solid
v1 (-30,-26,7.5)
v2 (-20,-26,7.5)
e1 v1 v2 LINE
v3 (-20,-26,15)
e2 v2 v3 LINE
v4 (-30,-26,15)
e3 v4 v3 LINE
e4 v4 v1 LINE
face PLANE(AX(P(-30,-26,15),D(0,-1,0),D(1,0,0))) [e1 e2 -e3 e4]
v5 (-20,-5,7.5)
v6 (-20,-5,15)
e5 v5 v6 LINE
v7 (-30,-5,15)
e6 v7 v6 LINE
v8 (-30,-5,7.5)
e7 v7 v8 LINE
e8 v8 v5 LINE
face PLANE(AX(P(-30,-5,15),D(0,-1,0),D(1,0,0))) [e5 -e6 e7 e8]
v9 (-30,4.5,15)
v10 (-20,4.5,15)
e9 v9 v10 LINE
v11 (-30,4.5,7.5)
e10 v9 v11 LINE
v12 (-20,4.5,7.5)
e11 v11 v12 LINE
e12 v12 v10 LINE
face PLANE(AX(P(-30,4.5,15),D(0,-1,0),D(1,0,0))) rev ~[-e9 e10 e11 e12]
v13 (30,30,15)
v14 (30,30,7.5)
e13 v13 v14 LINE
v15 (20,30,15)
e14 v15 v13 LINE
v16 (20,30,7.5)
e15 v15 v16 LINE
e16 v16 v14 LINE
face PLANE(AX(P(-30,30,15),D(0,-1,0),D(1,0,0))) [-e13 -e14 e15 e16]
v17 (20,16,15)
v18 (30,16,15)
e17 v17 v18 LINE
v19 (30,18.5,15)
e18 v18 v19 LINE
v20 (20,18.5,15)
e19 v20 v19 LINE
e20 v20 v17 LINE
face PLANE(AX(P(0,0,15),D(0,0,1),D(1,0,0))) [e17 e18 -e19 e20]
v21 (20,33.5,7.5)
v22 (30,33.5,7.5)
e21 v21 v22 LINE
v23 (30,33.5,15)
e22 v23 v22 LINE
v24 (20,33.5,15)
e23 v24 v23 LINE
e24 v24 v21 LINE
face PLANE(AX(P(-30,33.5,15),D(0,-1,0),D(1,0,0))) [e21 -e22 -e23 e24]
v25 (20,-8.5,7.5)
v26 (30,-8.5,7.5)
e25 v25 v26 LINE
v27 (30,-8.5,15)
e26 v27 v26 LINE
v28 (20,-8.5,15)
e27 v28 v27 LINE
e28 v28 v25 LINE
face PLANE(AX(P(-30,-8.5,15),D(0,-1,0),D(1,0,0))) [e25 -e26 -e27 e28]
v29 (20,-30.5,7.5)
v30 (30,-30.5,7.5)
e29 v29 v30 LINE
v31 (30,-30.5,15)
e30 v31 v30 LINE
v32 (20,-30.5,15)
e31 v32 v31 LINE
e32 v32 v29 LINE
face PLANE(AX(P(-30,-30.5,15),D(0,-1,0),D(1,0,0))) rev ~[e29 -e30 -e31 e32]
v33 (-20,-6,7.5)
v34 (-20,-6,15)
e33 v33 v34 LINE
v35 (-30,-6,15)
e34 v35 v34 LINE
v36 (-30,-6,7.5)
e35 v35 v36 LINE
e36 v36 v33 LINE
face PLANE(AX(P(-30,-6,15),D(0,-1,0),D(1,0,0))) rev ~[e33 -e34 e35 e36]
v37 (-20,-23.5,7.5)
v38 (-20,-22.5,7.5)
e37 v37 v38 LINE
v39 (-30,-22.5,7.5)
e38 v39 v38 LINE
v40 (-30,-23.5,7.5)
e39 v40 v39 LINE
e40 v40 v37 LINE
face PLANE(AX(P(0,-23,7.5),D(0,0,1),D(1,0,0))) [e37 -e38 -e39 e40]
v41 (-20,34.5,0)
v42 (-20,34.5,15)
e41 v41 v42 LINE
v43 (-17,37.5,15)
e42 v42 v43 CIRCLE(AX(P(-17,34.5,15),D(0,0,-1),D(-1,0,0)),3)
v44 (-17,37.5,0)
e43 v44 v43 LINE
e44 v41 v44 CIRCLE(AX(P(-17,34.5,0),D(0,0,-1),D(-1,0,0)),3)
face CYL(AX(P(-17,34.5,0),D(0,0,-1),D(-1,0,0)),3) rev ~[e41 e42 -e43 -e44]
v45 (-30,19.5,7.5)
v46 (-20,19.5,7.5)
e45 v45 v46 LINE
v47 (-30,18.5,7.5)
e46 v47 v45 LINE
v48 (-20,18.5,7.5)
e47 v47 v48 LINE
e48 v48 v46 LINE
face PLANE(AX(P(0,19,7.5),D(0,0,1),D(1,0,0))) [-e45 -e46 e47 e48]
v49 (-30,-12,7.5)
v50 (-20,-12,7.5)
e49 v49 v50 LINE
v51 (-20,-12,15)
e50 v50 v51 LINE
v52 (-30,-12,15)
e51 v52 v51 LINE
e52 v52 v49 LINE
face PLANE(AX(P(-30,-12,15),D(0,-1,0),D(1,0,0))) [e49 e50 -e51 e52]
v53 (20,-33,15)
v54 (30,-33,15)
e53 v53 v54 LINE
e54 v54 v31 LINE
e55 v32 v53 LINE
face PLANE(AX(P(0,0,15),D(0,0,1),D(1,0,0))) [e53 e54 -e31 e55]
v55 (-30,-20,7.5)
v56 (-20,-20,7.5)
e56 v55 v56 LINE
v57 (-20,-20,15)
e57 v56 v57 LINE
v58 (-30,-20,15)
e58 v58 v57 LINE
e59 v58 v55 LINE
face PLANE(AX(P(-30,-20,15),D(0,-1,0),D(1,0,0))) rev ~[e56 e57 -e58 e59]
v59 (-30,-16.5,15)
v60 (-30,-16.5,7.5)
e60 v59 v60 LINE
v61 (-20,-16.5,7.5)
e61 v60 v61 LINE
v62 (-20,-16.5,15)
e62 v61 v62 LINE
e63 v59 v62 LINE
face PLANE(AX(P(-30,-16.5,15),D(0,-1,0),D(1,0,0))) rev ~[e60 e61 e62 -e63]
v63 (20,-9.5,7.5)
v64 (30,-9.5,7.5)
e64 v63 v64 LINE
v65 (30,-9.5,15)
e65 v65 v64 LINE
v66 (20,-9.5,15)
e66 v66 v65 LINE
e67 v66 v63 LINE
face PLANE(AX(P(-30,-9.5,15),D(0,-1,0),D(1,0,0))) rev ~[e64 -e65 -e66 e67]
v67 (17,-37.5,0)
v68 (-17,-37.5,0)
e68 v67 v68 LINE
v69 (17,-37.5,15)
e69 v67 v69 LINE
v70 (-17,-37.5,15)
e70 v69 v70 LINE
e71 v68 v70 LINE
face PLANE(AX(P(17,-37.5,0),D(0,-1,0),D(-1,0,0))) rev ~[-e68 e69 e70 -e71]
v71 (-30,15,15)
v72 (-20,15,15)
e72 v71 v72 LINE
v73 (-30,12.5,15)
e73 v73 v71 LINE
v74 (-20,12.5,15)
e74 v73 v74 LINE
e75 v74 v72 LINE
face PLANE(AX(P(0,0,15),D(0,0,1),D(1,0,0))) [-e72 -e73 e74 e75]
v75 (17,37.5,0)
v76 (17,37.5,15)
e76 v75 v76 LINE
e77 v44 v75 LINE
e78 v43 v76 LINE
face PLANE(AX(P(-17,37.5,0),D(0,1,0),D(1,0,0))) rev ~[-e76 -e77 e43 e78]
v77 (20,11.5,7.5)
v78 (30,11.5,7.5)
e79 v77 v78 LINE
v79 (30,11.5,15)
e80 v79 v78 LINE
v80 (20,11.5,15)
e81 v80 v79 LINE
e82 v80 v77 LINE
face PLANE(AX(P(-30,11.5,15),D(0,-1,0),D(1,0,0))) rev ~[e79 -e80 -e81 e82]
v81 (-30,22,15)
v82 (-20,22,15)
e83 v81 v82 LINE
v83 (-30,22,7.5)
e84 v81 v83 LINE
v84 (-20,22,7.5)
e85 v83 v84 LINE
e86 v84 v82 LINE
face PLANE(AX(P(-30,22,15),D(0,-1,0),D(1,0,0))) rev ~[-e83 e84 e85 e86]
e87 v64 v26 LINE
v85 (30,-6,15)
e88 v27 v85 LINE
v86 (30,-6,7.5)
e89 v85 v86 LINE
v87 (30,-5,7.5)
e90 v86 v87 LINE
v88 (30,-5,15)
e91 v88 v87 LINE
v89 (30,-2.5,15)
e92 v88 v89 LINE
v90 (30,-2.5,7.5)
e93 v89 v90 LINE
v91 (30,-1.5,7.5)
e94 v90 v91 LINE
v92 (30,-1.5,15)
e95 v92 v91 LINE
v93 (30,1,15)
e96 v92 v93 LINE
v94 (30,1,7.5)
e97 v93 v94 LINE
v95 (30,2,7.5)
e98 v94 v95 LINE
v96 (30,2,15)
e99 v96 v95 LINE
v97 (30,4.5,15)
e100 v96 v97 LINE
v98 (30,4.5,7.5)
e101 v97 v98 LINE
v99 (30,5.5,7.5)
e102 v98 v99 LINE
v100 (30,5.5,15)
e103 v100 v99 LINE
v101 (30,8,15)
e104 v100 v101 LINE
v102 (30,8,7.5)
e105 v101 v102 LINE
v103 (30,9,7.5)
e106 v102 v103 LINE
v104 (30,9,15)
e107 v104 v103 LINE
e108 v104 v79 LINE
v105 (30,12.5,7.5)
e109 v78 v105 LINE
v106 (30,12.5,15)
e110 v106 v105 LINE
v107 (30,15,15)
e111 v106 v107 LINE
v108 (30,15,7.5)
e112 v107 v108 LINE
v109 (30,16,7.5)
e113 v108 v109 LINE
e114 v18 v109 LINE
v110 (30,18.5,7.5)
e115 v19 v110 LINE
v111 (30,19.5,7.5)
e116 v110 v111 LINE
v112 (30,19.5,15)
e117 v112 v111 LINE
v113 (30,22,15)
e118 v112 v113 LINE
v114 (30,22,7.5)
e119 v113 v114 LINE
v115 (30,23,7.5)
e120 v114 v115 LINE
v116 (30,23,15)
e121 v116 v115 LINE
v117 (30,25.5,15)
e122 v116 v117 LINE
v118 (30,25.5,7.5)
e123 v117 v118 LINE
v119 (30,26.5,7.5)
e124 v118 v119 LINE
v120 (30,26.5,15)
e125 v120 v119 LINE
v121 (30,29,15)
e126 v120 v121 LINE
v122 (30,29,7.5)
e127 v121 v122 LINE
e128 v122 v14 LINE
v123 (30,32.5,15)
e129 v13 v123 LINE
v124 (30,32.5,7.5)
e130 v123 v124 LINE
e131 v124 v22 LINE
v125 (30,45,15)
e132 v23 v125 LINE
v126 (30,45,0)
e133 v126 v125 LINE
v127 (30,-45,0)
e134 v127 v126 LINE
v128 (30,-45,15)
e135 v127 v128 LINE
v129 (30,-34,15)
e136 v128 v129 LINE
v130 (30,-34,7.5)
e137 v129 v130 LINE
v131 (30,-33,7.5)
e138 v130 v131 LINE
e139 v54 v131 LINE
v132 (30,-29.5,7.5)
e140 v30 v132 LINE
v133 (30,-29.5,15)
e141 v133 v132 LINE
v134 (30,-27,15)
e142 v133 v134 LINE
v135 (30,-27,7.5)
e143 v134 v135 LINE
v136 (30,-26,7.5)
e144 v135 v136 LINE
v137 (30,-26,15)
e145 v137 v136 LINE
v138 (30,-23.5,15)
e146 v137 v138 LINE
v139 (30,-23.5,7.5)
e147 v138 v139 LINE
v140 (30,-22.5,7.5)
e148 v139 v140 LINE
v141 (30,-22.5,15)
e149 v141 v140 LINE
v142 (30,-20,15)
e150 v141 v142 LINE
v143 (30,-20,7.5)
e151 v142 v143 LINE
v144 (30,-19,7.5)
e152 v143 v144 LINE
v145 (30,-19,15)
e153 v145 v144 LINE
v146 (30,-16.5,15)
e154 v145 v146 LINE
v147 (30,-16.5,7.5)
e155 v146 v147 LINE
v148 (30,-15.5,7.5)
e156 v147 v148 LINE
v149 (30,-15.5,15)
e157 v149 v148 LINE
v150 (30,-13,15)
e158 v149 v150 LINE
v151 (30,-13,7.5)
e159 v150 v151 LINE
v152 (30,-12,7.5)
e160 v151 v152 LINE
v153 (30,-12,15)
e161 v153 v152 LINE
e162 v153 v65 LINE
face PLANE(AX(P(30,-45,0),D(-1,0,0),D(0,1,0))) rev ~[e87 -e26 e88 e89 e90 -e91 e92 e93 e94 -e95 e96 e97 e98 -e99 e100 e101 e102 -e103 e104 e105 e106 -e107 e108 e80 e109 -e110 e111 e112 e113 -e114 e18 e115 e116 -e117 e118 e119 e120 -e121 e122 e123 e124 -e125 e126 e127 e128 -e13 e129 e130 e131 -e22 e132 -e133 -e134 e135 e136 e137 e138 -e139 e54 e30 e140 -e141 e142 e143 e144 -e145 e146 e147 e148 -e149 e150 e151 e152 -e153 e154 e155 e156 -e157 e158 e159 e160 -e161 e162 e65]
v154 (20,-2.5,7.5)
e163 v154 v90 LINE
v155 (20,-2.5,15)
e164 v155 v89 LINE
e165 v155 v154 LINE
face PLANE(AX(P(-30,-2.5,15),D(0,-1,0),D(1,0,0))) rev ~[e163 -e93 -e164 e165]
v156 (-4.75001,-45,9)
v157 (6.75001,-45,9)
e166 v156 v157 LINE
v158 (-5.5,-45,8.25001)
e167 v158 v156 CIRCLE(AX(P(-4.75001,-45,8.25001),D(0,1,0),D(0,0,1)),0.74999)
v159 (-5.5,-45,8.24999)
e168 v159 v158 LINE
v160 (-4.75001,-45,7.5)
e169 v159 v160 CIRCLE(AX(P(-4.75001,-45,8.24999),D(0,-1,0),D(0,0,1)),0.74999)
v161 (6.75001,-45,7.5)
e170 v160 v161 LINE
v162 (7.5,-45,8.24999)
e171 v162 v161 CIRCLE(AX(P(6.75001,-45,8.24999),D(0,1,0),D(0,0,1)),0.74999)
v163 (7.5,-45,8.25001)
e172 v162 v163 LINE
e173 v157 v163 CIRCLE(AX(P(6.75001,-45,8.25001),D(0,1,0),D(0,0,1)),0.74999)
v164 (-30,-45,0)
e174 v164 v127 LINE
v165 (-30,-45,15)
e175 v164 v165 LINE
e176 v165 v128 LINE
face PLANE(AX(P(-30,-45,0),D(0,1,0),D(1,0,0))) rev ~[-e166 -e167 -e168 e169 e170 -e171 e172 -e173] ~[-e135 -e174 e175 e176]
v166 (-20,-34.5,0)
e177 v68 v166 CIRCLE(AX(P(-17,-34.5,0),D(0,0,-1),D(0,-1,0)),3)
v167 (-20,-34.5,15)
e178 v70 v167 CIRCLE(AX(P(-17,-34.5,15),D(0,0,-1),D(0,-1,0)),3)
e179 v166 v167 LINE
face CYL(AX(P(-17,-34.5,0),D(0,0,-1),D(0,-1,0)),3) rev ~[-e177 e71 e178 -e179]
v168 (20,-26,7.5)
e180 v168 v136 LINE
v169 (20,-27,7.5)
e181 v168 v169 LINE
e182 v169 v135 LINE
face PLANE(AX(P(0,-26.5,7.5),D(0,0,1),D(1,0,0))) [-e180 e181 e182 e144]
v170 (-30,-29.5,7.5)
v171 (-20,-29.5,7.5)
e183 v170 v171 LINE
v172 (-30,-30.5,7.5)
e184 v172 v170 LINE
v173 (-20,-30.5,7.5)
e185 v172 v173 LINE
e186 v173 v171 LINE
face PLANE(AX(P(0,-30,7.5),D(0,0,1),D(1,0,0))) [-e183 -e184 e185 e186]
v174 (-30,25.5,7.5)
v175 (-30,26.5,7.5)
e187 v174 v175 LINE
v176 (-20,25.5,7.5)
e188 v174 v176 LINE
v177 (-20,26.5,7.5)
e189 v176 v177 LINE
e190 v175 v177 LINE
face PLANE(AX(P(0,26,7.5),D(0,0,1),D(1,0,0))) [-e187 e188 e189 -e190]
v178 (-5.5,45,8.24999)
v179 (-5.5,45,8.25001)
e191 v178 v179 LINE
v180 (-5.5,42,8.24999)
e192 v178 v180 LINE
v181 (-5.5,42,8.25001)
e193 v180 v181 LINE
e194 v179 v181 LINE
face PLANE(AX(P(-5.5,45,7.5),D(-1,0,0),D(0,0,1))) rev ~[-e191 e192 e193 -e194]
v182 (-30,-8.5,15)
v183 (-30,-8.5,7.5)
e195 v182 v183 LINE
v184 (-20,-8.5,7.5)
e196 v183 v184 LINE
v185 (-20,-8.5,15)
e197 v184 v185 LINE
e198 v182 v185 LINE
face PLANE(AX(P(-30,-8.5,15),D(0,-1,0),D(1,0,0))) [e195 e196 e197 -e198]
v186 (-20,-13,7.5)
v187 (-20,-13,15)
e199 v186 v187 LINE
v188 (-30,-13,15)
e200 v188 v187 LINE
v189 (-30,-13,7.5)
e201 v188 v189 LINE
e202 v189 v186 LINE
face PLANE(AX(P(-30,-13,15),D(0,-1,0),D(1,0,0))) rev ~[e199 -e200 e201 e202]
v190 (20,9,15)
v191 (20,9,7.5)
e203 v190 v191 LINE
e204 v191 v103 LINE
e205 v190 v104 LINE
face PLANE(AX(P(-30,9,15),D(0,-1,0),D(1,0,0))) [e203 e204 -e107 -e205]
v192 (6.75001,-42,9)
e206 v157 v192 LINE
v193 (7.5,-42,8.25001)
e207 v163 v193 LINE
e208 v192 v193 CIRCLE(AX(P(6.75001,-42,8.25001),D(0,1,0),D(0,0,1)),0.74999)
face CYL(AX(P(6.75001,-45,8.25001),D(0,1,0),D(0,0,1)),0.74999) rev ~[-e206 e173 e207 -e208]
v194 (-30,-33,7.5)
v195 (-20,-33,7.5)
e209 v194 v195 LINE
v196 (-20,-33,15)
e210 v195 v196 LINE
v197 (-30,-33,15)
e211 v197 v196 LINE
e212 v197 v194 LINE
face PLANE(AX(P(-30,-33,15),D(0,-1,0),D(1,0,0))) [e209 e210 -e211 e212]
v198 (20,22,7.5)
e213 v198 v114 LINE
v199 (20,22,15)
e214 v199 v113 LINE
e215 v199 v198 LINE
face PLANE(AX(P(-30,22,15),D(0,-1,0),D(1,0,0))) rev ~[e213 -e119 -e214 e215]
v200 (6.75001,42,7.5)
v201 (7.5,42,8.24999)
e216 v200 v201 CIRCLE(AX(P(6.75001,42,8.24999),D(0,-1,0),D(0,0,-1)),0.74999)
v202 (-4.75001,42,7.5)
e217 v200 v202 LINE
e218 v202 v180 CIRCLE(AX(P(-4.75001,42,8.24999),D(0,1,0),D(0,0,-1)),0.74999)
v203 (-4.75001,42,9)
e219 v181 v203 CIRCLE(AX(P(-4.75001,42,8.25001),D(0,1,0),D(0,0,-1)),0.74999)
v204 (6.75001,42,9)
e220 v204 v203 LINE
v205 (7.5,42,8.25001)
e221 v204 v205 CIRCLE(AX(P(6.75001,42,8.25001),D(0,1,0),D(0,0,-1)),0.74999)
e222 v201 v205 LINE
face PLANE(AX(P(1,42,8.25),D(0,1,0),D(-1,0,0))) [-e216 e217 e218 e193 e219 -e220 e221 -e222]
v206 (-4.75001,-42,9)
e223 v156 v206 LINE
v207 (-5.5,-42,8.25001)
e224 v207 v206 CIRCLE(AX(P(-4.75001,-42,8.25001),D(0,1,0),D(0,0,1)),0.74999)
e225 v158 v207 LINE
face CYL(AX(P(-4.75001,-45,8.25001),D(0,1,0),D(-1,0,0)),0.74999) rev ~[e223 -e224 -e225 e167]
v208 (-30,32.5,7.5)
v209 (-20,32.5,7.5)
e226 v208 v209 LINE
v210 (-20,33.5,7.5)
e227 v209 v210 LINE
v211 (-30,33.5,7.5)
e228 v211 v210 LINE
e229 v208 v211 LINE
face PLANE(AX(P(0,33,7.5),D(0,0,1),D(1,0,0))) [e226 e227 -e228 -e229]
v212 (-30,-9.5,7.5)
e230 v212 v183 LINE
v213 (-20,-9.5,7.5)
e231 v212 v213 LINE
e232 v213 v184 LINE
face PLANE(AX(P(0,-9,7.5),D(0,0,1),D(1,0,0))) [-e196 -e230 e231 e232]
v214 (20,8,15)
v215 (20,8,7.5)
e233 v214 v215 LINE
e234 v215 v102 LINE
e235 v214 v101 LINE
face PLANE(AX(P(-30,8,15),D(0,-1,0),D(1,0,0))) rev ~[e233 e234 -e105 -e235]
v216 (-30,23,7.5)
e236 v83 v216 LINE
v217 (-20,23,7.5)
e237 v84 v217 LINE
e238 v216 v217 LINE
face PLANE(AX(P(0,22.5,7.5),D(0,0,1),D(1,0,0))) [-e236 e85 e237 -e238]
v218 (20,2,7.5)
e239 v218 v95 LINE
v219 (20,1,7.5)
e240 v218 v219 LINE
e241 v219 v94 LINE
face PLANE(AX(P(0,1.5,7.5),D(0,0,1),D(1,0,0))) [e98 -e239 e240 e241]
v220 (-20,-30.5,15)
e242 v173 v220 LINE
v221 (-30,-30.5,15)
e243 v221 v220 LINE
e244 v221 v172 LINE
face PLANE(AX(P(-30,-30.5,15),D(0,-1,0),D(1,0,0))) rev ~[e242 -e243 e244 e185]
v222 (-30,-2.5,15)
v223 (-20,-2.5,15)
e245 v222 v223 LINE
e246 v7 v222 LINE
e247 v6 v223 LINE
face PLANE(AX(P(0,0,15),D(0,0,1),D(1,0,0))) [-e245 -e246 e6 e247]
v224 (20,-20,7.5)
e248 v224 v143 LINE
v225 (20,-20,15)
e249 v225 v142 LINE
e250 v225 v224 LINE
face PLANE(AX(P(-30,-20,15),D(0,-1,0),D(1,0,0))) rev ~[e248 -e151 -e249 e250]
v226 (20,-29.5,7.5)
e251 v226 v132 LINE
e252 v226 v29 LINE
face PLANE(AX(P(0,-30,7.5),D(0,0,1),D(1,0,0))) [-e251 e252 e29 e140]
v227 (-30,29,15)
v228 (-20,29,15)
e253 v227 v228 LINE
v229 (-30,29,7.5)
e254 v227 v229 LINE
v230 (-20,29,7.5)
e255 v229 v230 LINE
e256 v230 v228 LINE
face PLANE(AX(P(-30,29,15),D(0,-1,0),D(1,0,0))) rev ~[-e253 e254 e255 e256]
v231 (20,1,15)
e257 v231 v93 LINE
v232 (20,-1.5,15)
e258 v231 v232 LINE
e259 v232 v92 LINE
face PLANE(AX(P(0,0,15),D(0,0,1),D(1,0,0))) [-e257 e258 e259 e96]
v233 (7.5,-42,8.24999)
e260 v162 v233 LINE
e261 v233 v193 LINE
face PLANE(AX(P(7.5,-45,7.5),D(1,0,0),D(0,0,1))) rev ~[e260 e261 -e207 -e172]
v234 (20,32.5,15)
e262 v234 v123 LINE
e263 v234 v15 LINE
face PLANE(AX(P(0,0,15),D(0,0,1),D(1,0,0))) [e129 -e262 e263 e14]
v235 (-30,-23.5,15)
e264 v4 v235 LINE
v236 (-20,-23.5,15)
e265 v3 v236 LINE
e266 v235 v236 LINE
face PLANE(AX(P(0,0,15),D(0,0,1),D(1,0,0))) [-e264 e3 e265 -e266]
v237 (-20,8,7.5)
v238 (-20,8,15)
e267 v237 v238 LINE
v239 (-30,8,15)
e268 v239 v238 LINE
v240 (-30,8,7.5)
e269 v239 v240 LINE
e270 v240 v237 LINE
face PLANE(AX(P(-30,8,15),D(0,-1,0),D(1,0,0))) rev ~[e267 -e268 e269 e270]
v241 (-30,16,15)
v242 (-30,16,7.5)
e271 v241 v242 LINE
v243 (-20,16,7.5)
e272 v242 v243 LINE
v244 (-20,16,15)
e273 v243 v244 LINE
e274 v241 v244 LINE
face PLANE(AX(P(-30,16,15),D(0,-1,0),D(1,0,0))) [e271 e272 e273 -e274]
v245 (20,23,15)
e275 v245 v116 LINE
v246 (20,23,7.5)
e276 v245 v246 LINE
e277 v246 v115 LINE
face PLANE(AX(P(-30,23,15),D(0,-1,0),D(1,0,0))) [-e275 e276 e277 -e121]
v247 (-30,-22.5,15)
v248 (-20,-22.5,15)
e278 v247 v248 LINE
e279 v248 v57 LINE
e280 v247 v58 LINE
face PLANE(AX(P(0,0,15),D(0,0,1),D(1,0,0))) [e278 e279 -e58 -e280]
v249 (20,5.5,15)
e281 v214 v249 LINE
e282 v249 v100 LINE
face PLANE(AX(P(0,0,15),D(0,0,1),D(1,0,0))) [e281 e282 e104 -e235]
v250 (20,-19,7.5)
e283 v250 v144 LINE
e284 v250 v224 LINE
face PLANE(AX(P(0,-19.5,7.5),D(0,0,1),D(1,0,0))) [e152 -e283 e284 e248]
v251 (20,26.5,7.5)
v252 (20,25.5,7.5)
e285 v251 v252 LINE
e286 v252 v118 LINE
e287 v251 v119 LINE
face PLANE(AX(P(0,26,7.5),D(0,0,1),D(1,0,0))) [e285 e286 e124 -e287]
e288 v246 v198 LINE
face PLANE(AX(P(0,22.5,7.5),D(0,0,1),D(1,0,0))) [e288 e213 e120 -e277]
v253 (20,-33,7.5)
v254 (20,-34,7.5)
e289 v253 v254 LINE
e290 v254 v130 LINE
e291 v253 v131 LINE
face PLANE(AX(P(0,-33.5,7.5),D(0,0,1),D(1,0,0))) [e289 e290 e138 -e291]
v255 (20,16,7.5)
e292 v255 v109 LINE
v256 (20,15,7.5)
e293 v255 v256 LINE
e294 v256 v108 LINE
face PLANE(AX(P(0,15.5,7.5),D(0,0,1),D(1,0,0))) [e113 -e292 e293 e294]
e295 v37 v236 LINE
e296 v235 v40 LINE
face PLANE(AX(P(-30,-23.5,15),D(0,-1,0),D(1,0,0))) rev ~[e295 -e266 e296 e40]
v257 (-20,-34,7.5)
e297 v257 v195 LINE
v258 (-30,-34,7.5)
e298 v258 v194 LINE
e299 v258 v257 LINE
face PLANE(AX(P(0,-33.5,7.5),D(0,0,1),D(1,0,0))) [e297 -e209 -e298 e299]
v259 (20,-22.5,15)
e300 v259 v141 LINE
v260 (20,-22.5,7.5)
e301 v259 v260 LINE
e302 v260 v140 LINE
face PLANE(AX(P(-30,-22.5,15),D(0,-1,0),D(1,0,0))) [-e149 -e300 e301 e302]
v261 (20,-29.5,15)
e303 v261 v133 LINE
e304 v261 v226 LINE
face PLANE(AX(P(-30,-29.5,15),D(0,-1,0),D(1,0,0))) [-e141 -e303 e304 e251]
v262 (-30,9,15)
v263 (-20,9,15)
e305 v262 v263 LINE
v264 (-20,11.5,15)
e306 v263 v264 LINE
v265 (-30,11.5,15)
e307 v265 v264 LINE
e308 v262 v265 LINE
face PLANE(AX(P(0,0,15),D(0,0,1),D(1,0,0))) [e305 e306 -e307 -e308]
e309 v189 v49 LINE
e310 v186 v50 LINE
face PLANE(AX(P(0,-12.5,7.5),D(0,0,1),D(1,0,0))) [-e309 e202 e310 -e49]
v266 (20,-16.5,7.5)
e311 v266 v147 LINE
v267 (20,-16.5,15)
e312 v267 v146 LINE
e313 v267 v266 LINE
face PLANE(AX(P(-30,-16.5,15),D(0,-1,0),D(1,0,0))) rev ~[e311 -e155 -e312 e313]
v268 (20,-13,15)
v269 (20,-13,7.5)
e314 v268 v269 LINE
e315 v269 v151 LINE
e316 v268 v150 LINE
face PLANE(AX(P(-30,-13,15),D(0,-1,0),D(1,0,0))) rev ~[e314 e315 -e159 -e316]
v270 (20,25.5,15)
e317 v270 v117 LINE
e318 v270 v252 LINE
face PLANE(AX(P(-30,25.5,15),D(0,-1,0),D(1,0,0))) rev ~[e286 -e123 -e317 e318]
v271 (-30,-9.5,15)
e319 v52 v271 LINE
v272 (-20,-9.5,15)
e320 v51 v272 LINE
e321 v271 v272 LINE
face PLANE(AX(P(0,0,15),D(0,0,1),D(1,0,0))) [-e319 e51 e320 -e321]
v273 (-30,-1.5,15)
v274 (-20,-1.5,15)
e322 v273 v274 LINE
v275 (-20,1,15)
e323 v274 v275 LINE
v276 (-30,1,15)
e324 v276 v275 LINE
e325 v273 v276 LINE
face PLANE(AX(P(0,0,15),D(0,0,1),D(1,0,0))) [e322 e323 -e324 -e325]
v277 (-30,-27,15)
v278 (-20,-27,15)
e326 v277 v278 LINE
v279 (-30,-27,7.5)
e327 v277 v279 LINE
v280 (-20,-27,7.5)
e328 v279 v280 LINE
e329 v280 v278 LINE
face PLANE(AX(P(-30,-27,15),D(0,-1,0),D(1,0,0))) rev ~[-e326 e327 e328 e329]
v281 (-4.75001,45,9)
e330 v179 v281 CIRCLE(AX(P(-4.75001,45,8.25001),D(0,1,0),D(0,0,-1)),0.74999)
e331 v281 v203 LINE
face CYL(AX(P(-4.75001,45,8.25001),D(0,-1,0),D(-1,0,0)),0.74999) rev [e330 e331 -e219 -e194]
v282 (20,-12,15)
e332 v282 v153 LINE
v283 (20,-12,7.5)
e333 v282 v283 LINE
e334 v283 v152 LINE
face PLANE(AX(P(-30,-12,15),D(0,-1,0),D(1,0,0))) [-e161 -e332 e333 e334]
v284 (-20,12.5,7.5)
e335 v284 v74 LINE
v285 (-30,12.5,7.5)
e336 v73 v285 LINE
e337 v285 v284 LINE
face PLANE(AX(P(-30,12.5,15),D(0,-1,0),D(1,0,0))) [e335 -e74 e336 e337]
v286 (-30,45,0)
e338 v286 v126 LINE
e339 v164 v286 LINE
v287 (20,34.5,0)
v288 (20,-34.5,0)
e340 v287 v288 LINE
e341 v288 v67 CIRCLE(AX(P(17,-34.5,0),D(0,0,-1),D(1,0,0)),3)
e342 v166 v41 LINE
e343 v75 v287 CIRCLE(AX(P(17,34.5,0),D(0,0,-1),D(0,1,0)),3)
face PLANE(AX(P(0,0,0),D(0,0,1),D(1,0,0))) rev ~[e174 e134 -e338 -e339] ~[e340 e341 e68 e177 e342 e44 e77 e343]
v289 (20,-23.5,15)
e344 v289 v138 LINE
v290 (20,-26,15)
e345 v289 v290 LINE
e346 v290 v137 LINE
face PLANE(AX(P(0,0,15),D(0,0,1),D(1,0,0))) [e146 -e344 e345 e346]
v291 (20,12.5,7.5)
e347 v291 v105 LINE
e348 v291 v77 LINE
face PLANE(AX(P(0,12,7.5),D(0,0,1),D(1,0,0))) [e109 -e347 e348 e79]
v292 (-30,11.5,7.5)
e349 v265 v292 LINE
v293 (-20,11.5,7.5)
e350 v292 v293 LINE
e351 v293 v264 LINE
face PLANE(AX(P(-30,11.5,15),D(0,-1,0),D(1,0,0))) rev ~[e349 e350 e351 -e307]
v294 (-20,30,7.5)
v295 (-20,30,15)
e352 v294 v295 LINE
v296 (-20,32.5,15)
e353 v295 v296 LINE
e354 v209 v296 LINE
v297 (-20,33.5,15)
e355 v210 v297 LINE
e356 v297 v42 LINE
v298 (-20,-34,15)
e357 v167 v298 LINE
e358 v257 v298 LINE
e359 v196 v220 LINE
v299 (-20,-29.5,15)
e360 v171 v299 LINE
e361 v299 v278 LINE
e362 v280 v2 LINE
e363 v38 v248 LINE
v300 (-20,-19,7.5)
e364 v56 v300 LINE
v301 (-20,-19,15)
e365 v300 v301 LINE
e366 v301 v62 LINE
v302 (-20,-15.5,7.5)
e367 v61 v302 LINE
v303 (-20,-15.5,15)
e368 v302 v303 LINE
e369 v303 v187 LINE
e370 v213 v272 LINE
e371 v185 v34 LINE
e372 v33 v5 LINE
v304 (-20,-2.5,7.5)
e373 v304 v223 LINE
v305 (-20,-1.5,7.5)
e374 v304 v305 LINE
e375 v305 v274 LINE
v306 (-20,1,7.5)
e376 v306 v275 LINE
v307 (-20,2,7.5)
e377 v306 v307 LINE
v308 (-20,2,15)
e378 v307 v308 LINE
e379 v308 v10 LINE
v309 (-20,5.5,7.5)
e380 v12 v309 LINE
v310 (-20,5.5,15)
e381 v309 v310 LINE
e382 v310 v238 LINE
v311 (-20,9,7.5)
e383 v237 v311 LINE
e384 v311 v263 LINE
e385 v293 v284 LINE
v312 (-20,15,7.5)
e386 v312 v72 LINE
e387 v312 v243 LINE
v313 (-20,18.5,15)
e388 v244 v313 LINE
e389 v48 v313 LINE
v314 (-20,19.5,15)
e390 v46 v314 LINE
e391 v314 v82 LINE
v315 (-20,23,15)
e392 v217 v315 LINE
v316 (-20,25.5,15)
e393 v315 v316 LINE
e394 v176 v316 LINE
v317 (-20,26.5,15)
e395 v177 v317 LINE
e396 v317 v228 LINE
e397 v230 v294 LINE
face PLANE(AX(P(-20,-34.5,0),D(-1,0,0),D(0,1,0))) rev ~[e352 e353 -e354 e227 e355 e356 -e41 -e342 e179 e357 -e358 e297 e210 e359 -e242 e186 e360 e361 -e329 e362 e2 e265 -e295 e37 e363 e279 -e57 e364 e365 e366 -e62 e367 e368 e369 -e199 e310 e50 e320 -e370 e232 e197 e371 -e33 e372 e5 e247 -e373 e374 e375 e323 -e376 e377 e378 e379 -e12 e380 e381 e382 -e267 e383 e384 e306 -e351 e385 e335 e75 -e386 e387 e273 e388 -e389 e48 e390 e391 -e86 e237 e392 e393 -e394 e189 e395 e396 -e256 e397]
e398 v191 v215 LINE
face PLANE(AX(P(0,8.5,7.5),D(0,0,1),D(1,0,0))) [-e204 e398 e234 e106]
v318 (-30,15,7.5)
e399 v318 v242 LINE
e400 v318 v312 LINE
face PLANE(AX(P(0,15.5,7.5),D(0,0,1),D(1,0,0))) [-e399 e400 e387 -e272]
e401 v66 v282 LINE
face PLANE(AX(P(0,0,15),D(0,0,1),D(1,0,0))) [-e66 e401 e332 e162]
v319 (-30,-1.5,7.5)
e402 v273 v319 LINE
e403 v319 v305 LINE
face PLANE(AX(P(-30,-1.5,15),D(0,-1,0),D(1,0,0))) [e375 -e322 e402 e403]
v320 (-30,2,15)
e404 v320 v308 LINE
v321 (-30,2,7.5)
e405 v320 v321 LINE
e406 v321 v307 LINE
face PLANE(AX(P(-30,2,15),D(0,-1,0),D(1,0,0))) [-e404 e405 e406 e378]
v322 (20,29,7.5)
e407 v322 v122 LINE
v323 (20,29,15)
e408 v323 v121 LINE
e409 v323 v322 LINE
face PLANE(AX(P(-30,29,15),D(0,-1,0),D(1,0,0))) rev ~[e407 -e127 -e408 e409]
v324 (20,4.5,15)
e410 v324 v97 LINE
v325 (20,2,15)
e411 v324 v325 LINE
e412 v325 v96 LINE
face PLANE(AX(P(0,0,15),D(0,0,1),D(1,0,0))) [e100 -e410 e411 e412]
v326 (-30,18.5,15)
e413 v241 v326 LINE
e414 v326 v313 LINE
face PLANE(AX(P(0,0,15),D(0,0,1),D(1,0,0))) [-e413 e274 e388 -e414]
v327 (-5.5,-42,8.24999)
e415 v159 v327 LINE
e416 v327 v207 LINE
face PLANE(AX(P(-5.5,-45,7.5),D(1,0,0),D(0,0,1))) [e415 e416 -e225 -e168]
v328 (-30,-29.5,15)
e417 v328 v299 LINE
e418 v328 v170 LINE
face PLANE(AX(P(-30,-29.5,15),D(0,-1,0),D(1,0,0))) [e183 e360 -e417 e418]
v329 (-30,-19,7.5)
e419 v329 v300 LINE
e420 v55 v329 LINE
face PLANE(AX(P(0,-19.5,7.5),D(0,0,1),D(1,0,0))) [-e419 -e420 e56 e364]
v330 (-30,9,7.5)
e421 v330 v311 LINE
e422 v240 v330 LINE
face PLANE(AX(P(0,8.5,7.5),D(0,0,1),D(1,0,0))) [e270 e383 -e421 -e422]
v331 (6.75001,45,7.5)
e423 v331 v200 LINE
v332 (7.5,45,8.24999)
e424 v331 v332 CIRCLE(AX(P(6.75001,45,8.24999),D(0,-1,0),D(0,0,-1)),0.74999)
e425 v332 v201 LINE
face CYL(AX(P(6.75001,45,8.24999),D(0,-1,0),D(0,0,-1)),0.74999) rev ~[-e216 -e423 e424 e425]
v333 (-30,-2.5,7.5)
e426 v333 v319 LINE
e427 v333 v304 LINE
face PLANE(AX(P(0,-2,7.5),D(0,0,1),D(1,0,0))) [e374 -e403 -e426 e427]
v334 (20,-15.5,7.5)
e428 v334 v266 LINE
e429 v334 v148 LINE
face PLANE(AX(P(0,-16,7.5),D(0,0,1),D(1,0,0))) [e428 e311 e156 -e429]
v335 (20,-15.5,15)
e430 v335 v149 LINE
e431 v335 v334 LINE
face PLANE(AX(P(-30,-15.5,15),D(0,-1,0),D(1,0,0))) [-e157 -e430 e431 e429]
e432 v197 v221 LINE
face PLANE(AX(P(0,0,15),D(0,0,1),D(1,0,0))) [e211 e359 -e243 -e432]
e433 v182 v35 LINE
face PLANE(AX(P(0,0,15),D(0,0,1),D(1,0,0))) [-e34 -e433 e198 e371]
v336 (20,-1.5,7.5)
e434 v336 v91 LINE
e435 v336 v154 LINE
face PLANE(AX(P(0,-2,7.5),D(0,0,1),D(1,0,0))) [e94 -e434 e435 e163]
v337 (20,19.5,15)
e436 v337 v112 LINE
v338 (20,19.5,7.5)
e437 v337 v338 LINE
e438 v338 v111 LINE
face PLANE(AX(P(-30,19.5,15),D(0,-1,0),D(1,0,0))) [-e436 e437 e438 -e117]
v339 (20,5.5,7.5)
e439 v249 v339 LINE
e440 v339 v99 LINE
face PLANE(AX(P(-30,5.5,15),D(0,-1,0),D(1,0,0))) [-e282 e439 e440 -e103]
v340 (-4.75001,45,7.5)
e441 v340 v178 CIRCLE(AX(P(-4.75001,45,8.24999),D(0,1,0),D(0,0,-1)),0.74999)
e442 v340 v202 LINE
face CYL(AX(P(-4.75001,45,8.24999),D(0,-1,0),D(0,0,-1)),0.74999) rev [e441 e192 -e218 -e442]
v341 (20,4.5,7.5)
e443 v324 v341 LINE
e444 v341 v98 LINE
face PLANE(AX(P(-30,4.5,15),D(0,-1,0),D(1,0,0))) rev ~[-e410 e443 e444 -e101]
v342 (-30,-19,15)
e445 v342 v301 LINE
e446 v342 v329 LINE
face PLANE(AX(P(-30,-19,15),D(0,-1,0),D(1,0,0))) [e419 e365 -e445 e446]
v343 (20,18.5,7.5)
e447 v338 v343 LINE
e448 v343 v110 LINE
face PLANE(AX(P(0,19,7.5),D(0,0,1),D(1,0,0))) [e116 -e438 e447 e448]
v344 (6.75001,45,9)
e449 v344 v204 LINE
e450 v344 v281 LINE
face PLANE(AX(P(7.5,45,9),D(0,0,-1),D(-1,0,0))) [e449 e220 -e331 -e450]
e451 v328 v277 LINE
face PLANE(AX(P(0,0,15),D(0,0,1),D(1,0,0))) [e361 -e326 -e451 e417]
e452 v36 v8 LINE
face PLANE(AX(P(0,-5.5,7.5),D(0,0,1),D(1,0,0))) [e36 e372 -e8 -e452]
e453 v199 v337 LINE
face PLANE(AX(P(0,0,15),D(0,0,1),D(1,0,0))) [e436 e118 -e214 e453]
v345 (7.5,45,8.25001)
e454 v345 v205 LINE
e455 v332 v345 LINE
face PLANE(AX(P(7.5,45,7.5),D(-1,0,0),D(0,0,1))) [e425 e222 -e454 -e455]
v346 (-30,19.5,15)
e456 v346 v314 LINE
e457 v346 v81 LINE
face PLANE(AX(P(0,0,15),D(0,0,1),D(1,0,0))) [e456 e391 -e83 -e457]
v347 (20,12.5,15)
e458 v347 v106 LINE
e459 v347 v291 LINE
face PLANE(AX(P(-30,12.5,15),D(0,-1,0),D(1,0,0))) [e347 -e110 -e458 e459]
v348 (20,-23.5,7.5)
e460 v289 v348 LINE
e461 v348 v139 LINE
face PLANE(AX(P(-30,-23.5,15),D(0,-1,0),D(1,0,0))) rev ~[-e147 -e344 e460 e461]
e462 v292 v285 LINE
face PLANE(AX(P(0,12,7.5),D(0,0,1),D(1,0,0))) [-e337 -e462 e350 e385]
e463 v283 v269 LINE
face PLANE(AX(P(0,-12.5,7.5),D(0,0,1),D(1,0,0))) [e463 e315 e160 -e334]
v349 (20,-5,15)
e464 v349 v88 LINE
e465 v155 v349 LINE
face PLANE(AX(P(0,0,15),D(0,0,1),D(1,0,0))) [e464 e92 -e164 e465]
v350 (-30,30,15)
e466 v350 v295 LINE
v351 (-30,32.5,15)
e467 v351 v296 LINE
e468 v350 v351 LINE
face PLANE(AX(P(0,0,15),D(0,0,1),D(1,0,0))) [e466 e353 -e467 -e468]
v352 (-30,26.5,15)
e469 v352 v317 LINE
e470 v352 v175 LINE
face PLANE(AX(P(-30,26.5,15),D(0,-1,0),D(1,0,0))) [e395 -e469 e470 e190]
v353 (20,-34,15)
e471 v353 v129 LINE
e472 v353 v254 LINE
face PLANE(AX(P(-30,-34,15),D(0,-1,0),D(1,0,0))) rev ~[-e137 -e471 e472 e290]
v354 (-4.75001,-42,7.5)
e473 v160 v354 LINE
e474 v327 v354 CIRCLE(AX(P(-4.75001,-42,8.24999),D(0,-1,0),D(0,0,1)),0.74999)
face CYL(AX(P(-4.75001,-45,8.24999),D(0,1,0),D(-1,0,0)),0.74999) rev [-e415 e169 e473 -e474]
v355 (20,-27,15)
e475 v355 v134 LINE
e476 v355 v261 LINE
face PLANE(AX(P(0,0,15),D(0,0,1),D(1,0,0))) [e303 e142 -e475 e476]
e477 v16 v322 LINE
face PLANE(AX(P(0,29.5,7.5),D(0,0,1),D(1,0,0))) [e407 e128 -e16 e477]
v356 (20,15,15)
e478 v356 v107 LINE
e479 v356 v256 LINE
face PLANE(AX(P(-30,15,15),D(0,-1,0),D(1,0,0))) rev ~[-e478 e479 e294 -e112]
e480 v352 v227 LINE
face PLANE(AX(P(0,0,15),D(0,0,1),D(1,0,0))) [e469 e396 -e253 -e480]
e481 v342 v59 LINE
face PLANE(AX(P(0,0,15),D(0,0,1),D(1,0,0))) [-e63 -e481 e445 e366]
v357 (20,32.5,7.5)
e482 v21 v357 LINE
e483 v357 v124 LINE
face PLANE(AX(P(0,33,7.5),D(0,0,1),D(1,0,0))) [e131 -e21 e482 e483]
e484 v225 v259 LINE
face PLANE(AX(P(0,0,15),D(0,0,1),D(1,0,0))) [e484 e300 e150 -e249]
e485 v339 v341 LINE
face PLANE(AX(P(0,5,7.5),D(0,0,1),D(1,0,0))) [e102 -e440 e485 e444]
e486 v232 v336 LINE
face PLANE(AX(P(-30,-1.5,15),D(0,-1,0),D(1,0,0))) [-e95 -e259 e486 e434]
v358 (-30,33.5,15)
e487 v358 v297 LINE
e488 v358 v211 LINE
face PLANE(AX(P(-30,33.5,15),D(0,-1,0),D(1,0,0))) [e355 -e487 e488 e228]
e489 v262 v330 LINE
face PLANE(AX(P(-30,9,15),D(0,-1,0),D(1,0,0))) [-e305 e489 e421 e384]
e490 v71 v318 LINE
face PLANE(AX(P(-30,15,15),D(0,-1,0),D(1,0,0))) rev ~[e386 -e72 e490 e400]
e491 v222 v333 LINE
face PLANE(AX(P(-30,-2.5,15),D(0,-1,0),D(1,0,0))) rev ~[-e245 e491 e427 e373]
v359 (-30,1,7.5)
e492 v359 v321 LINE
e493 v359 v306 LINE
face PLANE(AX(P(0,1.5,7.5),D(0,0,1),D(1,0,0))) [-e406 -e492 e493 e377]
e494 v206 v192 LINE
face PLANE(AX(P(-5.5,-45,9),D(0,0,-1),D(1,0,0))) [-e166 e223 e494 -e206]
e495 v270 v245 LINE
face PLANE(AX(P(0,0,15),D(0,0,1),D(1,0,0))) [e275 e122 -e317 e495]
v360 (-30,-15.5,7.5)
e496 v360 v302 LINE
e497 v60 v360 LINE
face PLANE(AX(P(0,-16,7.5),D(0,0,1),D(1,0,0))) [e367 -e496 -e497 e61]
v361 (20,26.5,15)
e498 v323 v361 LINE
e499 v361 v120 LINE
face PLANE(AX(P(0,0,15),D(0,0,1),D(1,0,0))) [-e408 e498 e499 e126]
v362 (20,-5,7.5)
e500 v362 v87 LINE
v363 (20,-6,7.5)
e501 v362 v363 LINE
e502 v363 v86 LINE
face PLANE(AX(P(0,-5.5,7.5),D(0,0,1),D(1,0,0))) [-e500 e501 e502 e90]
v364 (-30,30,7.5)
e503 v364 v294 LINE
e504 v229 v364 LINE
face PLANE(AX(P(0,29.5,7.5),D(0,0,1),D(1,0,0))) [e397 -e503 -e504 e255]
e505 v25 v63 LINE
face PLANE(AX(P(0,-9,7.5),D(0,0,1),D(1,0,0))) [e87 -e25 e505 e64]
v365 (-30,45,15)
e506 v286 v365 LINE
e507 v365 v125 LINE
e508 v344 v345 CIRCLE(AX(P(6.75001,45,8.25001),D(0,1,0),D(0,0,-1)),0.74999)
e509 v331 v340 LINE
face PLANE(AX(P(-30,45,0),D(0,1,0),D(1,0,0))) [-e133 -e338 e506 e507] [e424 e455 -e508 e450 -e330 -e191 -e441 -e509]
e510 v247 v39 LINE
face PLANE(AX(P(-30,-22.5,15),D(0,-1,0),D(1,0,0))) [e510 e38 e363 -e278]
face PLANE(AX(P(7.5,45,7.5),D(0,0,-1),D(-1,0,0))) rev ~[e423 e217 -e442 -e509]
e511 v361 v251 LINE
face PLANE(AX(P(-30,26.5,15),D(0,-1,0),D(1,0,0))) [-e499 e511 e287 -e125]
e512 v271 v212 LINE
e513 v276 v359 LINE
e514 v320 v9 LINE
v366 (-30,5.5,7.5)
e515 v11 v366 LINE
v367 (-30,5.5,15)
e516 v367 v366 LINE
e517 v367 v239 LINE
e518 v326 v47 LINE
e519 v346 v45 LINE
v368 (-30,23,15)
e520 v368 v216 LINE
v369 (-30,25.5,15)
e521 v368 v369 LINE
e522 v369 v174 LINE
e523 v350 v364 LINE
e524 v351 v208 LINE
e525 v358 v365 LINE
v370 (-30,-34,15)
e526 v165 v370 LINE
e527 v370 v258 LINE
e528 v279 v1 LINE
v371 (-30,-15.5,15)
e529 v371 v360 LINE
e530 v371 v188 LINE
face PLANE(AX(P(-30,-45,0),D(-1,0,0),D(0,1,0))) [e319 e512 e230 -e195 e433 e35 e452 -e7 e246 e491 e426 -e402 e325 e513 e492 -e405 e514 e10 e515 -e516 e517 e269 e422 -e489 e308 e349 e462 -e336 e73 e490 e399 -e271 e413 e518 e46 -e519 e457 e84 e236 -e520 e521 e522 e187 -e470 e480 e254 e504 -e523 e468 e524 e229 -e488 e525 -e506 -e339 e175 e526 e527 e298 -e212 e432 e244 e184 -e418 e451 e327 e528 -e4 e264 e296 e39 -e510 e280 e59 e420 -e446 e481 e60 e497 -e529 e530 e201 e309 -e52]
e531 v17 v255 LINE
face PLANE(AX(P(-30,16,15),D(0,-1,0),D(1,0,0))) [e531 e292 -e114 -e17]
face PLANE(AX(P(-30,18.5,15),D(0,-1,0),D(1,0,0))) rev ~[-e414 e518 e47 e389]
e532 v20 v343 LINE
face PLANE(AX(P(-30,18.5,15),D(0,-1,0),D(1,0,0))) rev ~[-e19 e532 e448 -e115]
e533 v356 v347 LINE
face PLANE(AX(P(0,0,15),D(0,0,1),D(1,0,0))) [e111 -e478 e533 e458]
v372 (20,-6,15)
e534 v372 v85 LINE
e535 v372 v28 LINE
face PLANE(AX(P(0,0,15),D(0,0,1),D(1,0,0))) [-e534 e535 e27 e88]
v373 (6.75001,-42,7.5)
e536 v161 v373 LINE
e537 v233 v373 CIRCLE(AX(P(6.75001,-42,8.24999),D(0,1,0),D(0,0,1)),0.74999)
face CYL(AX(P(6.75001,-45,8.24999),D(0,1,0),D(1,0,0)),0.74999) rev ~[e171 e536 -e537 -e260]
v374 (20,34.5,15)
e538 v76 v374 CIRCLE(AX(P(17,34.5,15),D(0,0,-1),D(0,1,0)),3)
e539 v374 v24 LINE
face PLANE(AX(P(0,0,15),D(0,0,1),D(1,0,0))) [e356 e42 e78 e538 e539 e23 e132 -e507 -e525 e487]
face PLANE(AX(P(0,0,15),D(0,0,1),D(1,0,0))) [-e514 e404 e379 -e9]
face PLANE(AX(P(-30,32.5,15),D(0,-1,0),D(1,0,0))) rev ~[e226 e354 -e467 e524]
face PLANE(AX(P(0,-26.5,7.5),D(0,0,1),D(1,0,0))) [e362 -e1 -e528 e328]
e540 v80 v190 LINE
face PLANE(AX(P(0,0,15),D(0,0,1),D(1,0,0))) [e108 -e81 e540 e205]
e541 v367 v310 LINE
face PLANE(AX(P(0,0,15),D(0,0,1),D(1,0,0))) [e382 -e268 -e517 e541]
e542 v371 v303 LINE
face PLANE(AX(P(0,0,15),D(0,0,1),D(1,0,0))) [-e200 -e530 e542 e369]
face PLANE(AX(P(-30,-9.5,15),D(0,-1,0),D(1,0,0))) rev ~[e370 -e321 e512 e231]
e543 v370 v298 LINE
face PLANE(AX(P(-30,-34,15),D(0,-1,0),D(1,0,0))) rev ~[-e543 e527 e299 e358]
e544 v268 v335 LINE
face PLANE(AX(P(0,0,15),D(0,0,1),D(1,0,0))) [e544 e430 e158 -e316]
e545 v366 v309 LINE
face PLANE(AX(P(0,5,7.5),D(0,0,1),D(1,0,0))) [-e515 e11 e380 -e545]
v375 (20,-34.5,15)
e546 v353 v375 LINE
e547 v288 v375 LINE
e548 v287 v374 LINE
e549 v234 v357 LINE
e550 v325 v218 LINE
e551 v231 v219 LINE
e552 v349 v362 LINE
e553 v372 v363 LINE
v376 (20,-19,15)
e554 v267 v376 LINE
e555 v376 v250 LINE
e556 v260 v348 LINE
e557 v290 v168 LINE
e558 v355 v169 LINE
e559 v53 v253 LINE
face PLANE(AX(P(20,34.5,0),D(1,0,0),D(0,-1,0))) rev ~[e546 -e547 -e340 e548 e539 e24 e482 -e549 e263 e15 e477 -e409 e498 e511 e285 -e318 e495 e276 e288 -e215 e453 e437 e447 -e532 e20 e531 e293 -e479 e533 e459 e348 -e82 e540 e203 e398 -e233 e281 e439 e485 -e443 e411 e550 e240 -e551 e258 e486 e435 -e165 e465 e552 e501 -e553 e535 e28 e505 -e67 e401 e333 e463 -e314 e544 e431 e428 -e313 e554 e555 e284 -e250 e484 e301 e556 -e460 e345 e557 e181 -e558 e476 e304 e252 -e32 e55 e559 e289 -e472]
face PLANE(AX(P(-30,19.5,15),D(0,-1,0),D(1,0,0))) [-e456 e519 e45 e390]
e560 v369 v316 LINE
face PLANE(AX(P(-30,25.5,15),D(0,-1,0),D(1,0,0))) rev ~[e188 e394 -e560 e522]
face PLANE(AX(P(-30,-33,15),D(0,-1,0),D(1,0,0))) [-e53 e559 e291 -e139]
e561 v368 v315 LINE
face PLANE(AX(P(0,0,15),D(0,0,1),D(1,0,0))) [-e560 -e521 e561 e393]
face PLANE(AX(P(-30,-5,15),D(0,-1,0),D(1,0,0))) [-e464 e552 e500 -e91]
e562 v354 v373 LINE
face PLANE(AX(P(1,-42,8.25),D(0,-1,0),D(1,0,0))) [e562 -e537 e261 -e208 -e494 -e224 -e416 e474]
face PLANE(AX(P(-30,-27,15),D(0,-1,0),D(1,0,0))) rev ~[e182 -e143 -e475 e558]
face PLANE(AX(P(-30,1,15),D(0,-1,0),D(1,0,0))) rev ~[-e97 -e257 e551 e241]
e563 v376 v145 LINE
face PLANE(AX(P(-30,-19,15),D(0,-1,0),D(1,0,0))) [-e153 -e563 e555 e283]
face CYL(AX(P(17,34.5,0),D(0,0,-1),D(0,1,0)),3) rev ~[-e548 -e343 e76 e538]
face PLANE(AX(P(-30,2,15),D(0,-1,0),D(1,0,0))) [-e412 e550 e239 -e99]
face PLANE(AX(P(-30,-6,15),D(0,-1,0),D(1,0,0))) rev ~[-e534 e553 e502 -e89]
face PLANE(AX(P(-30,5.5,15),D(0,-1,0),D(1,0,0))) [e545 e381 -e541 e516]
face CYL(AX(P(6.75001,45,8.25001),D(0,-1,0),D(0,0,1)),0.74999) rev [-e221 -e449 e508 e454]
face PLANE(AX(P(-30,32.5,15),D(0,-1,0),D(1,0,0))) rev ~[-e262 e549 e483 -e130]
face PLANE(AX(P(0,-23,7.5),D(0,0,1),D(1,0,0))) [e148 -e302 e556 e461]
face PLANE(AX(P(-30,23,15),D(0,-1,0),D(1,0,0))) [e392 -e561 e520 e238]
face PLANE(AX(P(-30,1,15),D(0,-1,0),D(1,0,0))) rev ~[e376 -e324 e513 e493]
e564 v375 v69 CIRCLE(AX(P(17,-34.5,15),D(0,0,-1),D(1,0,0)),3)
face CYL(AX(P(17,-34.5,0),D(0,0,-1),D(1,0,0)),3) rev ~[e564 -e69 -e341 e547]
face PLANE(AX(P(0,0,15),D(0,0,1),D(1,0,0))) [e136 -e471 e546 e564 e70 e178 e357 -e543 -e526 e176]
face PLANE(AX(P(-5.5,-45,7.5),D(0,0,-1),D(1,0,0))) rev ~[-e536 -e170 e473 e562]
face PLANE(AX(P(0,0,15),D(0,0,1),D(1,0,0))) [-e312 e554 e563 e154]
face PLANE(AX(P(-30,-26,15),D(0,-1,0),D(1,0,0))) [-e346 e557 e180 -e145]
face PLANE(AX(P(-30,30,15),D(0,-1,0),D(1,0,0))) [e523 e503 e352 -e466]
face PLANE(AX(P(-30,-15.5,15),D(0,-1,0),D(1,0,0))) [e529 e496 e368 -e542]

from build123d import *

# Parameters (mm, degrees)
F0_W     = 60
F0_H     = 90
F1_DEPTH = 15
F2_W     = 60
F2_H     = 1
F3_DEPTH = 7.5
F4_W     = 13
F4_H     = 1.5
F5_DEPTH = 3
F6_R     = 0.74999
F7_W     = 13
F7_H     = 1.5
F8_DEPTH = 3
F9_R     = 0.74999


# Not quite as in the source:
# - a fillet or chamfer is up to 0.001 mm smaller than in the source, because OpenCascade refuses the exact size


with BuildPart() as f1:
    # F0 (on Top) → F1 (new body)
    with BuildSketch(Plane.XY):
        Rectangle(F0_W, F0_H)
        with BuildLine():
            ThreePointArc((-20, 34.5), (-19.1213203436, 36.6213203436), (-17, 37.5))
            Line((-17, 37.5), (17, 37.5))
            ThreePointArc((17, 37.5), (19.1213203436, 36.6213203436), (20, 34.5))
            Line((20, 34.5), (20, -34.5))
            ThreePointArc((20, -34.5), (19.1213203436, -36.6213203436), (17, -37.5))
            Line((17, -37.5), (-17, -37.5))
            ThreePointArc((-17, -37.5), (-19.1213203436, -36.6213203436), (-20, -34.5))
            Line((-20, -34.5), (-20, 34.5))
        make_face(mode=Mode.SUBTRACT)
    extrude(amount=F1_DEPTH)

    # F2 (on face) → F3 (cut)
    with BuildSketch(Plane.XY.offset(15)):
        with Locations((0, -33.5)):
            Rectangle(F2_W, F2_H)
        with Locations((0, -30)):
            Rectangle(F2_W, F2_H)
        with Locations((0, -26.5)):
            Rectangle(F2_W, F2_H)
        with Locations((0, -23)):
            Rectangle(F2_W, F2_H)
        with Locations((0, -19.5)):
            Rectangle(F2_W, F2_H)
        with Locations((0, -16)):
            Rectangle(F2_W, F2_H)
        with Locations((0, -12.5)):
            Rectangle(F2_W, F2_H)
        with Locations((0, -9)):
            Rectangle(F2_W, F2_H)
        with Locations((0, -5.5)):
            Rectangle(F2_W, F2_H)
        with Locations((0, -2)):
            Rectangle(F2_W, F2_H)
        with Locations((0, 1.5)):
            Rectangle(F2_W, F2_H)
        with Locations((0, 5)):
            Rectangle(F2_W, F2_H)
        with Locations((0, 8.5)):
            Rectangle(F2_W, F2_H)
        with Locations((0, 12)):
            Rectangle(F2_W, F2_H)
        with Locations((0, 15.5)):
            Rectangle(F2_W, F2_H)
        with Locations((0, 19)):
            Rectangle(F2_W, F2_H)
        with Locations((0, 22.5)):
            Rectangle(F2_W, F2_H)
        with Locations((0, 26)):
            Rectangle(F2_W, F2_H)
        with Locations((0, 29.5)):
            Rectangle(F2_W, F2_H)
        with Locations((0, 33)):
            Rectangle(F2_W, F2_H)
    extrude(amount=-F3_DEPTH, mode=Mode.SUBTRACT)

    # F4 (on face) → F5 (cut)
    with BuildSketch(Plane.XZ.offset(45)):
        with Locations((1, 8.25)):
            Rectangle(F4_W, F4_H)
    extrude(amount=-F5_DEPTH, mode=Mode.SUBTRACT)

    # F6 (radius 0.75 in the source; OpenCascade refuses exactly that, so slightly less here)
    f6_edges = [f1.edges().sort_by_distance(p)[0] for p in [
        (-5.5, -43.5, 7.5),
        (-5.5, -43.5, 9),
        (7.5, -43.5, 7.5),
        (7.5, -43.5, 9),
    ]]
    fillet(f6_edges, radius=F6_R)

    # F7 (on face) → F8 (cut)
    with BuildSketch(Plane(origin=(0, 45, 0), x_dir=(-1, 0, 0), z_dir=(0, 1, 0))):
        with Locations((-1, 8.25)):
            Rectangle(F7_W, F7_H)
    extrude(amount=-F8_DEPTH, mode=Mode.SUBTRACT)

    # F9 (radius 0.75 in the source; OpenCascade refuses exactly that, so slightly less here)
    f9_edges = [f1.edges().sort_by_distance(p)[0] for p in [
        (-5.5, 43.5, 7.5),
        (-5.5, 43.5, 9),
        (7.5, 43.5, 9),
        (7.5, 43.5, 7.5),
    ]]
    fillet(f9_edges, radius=F9_R)


solid = f1.part
